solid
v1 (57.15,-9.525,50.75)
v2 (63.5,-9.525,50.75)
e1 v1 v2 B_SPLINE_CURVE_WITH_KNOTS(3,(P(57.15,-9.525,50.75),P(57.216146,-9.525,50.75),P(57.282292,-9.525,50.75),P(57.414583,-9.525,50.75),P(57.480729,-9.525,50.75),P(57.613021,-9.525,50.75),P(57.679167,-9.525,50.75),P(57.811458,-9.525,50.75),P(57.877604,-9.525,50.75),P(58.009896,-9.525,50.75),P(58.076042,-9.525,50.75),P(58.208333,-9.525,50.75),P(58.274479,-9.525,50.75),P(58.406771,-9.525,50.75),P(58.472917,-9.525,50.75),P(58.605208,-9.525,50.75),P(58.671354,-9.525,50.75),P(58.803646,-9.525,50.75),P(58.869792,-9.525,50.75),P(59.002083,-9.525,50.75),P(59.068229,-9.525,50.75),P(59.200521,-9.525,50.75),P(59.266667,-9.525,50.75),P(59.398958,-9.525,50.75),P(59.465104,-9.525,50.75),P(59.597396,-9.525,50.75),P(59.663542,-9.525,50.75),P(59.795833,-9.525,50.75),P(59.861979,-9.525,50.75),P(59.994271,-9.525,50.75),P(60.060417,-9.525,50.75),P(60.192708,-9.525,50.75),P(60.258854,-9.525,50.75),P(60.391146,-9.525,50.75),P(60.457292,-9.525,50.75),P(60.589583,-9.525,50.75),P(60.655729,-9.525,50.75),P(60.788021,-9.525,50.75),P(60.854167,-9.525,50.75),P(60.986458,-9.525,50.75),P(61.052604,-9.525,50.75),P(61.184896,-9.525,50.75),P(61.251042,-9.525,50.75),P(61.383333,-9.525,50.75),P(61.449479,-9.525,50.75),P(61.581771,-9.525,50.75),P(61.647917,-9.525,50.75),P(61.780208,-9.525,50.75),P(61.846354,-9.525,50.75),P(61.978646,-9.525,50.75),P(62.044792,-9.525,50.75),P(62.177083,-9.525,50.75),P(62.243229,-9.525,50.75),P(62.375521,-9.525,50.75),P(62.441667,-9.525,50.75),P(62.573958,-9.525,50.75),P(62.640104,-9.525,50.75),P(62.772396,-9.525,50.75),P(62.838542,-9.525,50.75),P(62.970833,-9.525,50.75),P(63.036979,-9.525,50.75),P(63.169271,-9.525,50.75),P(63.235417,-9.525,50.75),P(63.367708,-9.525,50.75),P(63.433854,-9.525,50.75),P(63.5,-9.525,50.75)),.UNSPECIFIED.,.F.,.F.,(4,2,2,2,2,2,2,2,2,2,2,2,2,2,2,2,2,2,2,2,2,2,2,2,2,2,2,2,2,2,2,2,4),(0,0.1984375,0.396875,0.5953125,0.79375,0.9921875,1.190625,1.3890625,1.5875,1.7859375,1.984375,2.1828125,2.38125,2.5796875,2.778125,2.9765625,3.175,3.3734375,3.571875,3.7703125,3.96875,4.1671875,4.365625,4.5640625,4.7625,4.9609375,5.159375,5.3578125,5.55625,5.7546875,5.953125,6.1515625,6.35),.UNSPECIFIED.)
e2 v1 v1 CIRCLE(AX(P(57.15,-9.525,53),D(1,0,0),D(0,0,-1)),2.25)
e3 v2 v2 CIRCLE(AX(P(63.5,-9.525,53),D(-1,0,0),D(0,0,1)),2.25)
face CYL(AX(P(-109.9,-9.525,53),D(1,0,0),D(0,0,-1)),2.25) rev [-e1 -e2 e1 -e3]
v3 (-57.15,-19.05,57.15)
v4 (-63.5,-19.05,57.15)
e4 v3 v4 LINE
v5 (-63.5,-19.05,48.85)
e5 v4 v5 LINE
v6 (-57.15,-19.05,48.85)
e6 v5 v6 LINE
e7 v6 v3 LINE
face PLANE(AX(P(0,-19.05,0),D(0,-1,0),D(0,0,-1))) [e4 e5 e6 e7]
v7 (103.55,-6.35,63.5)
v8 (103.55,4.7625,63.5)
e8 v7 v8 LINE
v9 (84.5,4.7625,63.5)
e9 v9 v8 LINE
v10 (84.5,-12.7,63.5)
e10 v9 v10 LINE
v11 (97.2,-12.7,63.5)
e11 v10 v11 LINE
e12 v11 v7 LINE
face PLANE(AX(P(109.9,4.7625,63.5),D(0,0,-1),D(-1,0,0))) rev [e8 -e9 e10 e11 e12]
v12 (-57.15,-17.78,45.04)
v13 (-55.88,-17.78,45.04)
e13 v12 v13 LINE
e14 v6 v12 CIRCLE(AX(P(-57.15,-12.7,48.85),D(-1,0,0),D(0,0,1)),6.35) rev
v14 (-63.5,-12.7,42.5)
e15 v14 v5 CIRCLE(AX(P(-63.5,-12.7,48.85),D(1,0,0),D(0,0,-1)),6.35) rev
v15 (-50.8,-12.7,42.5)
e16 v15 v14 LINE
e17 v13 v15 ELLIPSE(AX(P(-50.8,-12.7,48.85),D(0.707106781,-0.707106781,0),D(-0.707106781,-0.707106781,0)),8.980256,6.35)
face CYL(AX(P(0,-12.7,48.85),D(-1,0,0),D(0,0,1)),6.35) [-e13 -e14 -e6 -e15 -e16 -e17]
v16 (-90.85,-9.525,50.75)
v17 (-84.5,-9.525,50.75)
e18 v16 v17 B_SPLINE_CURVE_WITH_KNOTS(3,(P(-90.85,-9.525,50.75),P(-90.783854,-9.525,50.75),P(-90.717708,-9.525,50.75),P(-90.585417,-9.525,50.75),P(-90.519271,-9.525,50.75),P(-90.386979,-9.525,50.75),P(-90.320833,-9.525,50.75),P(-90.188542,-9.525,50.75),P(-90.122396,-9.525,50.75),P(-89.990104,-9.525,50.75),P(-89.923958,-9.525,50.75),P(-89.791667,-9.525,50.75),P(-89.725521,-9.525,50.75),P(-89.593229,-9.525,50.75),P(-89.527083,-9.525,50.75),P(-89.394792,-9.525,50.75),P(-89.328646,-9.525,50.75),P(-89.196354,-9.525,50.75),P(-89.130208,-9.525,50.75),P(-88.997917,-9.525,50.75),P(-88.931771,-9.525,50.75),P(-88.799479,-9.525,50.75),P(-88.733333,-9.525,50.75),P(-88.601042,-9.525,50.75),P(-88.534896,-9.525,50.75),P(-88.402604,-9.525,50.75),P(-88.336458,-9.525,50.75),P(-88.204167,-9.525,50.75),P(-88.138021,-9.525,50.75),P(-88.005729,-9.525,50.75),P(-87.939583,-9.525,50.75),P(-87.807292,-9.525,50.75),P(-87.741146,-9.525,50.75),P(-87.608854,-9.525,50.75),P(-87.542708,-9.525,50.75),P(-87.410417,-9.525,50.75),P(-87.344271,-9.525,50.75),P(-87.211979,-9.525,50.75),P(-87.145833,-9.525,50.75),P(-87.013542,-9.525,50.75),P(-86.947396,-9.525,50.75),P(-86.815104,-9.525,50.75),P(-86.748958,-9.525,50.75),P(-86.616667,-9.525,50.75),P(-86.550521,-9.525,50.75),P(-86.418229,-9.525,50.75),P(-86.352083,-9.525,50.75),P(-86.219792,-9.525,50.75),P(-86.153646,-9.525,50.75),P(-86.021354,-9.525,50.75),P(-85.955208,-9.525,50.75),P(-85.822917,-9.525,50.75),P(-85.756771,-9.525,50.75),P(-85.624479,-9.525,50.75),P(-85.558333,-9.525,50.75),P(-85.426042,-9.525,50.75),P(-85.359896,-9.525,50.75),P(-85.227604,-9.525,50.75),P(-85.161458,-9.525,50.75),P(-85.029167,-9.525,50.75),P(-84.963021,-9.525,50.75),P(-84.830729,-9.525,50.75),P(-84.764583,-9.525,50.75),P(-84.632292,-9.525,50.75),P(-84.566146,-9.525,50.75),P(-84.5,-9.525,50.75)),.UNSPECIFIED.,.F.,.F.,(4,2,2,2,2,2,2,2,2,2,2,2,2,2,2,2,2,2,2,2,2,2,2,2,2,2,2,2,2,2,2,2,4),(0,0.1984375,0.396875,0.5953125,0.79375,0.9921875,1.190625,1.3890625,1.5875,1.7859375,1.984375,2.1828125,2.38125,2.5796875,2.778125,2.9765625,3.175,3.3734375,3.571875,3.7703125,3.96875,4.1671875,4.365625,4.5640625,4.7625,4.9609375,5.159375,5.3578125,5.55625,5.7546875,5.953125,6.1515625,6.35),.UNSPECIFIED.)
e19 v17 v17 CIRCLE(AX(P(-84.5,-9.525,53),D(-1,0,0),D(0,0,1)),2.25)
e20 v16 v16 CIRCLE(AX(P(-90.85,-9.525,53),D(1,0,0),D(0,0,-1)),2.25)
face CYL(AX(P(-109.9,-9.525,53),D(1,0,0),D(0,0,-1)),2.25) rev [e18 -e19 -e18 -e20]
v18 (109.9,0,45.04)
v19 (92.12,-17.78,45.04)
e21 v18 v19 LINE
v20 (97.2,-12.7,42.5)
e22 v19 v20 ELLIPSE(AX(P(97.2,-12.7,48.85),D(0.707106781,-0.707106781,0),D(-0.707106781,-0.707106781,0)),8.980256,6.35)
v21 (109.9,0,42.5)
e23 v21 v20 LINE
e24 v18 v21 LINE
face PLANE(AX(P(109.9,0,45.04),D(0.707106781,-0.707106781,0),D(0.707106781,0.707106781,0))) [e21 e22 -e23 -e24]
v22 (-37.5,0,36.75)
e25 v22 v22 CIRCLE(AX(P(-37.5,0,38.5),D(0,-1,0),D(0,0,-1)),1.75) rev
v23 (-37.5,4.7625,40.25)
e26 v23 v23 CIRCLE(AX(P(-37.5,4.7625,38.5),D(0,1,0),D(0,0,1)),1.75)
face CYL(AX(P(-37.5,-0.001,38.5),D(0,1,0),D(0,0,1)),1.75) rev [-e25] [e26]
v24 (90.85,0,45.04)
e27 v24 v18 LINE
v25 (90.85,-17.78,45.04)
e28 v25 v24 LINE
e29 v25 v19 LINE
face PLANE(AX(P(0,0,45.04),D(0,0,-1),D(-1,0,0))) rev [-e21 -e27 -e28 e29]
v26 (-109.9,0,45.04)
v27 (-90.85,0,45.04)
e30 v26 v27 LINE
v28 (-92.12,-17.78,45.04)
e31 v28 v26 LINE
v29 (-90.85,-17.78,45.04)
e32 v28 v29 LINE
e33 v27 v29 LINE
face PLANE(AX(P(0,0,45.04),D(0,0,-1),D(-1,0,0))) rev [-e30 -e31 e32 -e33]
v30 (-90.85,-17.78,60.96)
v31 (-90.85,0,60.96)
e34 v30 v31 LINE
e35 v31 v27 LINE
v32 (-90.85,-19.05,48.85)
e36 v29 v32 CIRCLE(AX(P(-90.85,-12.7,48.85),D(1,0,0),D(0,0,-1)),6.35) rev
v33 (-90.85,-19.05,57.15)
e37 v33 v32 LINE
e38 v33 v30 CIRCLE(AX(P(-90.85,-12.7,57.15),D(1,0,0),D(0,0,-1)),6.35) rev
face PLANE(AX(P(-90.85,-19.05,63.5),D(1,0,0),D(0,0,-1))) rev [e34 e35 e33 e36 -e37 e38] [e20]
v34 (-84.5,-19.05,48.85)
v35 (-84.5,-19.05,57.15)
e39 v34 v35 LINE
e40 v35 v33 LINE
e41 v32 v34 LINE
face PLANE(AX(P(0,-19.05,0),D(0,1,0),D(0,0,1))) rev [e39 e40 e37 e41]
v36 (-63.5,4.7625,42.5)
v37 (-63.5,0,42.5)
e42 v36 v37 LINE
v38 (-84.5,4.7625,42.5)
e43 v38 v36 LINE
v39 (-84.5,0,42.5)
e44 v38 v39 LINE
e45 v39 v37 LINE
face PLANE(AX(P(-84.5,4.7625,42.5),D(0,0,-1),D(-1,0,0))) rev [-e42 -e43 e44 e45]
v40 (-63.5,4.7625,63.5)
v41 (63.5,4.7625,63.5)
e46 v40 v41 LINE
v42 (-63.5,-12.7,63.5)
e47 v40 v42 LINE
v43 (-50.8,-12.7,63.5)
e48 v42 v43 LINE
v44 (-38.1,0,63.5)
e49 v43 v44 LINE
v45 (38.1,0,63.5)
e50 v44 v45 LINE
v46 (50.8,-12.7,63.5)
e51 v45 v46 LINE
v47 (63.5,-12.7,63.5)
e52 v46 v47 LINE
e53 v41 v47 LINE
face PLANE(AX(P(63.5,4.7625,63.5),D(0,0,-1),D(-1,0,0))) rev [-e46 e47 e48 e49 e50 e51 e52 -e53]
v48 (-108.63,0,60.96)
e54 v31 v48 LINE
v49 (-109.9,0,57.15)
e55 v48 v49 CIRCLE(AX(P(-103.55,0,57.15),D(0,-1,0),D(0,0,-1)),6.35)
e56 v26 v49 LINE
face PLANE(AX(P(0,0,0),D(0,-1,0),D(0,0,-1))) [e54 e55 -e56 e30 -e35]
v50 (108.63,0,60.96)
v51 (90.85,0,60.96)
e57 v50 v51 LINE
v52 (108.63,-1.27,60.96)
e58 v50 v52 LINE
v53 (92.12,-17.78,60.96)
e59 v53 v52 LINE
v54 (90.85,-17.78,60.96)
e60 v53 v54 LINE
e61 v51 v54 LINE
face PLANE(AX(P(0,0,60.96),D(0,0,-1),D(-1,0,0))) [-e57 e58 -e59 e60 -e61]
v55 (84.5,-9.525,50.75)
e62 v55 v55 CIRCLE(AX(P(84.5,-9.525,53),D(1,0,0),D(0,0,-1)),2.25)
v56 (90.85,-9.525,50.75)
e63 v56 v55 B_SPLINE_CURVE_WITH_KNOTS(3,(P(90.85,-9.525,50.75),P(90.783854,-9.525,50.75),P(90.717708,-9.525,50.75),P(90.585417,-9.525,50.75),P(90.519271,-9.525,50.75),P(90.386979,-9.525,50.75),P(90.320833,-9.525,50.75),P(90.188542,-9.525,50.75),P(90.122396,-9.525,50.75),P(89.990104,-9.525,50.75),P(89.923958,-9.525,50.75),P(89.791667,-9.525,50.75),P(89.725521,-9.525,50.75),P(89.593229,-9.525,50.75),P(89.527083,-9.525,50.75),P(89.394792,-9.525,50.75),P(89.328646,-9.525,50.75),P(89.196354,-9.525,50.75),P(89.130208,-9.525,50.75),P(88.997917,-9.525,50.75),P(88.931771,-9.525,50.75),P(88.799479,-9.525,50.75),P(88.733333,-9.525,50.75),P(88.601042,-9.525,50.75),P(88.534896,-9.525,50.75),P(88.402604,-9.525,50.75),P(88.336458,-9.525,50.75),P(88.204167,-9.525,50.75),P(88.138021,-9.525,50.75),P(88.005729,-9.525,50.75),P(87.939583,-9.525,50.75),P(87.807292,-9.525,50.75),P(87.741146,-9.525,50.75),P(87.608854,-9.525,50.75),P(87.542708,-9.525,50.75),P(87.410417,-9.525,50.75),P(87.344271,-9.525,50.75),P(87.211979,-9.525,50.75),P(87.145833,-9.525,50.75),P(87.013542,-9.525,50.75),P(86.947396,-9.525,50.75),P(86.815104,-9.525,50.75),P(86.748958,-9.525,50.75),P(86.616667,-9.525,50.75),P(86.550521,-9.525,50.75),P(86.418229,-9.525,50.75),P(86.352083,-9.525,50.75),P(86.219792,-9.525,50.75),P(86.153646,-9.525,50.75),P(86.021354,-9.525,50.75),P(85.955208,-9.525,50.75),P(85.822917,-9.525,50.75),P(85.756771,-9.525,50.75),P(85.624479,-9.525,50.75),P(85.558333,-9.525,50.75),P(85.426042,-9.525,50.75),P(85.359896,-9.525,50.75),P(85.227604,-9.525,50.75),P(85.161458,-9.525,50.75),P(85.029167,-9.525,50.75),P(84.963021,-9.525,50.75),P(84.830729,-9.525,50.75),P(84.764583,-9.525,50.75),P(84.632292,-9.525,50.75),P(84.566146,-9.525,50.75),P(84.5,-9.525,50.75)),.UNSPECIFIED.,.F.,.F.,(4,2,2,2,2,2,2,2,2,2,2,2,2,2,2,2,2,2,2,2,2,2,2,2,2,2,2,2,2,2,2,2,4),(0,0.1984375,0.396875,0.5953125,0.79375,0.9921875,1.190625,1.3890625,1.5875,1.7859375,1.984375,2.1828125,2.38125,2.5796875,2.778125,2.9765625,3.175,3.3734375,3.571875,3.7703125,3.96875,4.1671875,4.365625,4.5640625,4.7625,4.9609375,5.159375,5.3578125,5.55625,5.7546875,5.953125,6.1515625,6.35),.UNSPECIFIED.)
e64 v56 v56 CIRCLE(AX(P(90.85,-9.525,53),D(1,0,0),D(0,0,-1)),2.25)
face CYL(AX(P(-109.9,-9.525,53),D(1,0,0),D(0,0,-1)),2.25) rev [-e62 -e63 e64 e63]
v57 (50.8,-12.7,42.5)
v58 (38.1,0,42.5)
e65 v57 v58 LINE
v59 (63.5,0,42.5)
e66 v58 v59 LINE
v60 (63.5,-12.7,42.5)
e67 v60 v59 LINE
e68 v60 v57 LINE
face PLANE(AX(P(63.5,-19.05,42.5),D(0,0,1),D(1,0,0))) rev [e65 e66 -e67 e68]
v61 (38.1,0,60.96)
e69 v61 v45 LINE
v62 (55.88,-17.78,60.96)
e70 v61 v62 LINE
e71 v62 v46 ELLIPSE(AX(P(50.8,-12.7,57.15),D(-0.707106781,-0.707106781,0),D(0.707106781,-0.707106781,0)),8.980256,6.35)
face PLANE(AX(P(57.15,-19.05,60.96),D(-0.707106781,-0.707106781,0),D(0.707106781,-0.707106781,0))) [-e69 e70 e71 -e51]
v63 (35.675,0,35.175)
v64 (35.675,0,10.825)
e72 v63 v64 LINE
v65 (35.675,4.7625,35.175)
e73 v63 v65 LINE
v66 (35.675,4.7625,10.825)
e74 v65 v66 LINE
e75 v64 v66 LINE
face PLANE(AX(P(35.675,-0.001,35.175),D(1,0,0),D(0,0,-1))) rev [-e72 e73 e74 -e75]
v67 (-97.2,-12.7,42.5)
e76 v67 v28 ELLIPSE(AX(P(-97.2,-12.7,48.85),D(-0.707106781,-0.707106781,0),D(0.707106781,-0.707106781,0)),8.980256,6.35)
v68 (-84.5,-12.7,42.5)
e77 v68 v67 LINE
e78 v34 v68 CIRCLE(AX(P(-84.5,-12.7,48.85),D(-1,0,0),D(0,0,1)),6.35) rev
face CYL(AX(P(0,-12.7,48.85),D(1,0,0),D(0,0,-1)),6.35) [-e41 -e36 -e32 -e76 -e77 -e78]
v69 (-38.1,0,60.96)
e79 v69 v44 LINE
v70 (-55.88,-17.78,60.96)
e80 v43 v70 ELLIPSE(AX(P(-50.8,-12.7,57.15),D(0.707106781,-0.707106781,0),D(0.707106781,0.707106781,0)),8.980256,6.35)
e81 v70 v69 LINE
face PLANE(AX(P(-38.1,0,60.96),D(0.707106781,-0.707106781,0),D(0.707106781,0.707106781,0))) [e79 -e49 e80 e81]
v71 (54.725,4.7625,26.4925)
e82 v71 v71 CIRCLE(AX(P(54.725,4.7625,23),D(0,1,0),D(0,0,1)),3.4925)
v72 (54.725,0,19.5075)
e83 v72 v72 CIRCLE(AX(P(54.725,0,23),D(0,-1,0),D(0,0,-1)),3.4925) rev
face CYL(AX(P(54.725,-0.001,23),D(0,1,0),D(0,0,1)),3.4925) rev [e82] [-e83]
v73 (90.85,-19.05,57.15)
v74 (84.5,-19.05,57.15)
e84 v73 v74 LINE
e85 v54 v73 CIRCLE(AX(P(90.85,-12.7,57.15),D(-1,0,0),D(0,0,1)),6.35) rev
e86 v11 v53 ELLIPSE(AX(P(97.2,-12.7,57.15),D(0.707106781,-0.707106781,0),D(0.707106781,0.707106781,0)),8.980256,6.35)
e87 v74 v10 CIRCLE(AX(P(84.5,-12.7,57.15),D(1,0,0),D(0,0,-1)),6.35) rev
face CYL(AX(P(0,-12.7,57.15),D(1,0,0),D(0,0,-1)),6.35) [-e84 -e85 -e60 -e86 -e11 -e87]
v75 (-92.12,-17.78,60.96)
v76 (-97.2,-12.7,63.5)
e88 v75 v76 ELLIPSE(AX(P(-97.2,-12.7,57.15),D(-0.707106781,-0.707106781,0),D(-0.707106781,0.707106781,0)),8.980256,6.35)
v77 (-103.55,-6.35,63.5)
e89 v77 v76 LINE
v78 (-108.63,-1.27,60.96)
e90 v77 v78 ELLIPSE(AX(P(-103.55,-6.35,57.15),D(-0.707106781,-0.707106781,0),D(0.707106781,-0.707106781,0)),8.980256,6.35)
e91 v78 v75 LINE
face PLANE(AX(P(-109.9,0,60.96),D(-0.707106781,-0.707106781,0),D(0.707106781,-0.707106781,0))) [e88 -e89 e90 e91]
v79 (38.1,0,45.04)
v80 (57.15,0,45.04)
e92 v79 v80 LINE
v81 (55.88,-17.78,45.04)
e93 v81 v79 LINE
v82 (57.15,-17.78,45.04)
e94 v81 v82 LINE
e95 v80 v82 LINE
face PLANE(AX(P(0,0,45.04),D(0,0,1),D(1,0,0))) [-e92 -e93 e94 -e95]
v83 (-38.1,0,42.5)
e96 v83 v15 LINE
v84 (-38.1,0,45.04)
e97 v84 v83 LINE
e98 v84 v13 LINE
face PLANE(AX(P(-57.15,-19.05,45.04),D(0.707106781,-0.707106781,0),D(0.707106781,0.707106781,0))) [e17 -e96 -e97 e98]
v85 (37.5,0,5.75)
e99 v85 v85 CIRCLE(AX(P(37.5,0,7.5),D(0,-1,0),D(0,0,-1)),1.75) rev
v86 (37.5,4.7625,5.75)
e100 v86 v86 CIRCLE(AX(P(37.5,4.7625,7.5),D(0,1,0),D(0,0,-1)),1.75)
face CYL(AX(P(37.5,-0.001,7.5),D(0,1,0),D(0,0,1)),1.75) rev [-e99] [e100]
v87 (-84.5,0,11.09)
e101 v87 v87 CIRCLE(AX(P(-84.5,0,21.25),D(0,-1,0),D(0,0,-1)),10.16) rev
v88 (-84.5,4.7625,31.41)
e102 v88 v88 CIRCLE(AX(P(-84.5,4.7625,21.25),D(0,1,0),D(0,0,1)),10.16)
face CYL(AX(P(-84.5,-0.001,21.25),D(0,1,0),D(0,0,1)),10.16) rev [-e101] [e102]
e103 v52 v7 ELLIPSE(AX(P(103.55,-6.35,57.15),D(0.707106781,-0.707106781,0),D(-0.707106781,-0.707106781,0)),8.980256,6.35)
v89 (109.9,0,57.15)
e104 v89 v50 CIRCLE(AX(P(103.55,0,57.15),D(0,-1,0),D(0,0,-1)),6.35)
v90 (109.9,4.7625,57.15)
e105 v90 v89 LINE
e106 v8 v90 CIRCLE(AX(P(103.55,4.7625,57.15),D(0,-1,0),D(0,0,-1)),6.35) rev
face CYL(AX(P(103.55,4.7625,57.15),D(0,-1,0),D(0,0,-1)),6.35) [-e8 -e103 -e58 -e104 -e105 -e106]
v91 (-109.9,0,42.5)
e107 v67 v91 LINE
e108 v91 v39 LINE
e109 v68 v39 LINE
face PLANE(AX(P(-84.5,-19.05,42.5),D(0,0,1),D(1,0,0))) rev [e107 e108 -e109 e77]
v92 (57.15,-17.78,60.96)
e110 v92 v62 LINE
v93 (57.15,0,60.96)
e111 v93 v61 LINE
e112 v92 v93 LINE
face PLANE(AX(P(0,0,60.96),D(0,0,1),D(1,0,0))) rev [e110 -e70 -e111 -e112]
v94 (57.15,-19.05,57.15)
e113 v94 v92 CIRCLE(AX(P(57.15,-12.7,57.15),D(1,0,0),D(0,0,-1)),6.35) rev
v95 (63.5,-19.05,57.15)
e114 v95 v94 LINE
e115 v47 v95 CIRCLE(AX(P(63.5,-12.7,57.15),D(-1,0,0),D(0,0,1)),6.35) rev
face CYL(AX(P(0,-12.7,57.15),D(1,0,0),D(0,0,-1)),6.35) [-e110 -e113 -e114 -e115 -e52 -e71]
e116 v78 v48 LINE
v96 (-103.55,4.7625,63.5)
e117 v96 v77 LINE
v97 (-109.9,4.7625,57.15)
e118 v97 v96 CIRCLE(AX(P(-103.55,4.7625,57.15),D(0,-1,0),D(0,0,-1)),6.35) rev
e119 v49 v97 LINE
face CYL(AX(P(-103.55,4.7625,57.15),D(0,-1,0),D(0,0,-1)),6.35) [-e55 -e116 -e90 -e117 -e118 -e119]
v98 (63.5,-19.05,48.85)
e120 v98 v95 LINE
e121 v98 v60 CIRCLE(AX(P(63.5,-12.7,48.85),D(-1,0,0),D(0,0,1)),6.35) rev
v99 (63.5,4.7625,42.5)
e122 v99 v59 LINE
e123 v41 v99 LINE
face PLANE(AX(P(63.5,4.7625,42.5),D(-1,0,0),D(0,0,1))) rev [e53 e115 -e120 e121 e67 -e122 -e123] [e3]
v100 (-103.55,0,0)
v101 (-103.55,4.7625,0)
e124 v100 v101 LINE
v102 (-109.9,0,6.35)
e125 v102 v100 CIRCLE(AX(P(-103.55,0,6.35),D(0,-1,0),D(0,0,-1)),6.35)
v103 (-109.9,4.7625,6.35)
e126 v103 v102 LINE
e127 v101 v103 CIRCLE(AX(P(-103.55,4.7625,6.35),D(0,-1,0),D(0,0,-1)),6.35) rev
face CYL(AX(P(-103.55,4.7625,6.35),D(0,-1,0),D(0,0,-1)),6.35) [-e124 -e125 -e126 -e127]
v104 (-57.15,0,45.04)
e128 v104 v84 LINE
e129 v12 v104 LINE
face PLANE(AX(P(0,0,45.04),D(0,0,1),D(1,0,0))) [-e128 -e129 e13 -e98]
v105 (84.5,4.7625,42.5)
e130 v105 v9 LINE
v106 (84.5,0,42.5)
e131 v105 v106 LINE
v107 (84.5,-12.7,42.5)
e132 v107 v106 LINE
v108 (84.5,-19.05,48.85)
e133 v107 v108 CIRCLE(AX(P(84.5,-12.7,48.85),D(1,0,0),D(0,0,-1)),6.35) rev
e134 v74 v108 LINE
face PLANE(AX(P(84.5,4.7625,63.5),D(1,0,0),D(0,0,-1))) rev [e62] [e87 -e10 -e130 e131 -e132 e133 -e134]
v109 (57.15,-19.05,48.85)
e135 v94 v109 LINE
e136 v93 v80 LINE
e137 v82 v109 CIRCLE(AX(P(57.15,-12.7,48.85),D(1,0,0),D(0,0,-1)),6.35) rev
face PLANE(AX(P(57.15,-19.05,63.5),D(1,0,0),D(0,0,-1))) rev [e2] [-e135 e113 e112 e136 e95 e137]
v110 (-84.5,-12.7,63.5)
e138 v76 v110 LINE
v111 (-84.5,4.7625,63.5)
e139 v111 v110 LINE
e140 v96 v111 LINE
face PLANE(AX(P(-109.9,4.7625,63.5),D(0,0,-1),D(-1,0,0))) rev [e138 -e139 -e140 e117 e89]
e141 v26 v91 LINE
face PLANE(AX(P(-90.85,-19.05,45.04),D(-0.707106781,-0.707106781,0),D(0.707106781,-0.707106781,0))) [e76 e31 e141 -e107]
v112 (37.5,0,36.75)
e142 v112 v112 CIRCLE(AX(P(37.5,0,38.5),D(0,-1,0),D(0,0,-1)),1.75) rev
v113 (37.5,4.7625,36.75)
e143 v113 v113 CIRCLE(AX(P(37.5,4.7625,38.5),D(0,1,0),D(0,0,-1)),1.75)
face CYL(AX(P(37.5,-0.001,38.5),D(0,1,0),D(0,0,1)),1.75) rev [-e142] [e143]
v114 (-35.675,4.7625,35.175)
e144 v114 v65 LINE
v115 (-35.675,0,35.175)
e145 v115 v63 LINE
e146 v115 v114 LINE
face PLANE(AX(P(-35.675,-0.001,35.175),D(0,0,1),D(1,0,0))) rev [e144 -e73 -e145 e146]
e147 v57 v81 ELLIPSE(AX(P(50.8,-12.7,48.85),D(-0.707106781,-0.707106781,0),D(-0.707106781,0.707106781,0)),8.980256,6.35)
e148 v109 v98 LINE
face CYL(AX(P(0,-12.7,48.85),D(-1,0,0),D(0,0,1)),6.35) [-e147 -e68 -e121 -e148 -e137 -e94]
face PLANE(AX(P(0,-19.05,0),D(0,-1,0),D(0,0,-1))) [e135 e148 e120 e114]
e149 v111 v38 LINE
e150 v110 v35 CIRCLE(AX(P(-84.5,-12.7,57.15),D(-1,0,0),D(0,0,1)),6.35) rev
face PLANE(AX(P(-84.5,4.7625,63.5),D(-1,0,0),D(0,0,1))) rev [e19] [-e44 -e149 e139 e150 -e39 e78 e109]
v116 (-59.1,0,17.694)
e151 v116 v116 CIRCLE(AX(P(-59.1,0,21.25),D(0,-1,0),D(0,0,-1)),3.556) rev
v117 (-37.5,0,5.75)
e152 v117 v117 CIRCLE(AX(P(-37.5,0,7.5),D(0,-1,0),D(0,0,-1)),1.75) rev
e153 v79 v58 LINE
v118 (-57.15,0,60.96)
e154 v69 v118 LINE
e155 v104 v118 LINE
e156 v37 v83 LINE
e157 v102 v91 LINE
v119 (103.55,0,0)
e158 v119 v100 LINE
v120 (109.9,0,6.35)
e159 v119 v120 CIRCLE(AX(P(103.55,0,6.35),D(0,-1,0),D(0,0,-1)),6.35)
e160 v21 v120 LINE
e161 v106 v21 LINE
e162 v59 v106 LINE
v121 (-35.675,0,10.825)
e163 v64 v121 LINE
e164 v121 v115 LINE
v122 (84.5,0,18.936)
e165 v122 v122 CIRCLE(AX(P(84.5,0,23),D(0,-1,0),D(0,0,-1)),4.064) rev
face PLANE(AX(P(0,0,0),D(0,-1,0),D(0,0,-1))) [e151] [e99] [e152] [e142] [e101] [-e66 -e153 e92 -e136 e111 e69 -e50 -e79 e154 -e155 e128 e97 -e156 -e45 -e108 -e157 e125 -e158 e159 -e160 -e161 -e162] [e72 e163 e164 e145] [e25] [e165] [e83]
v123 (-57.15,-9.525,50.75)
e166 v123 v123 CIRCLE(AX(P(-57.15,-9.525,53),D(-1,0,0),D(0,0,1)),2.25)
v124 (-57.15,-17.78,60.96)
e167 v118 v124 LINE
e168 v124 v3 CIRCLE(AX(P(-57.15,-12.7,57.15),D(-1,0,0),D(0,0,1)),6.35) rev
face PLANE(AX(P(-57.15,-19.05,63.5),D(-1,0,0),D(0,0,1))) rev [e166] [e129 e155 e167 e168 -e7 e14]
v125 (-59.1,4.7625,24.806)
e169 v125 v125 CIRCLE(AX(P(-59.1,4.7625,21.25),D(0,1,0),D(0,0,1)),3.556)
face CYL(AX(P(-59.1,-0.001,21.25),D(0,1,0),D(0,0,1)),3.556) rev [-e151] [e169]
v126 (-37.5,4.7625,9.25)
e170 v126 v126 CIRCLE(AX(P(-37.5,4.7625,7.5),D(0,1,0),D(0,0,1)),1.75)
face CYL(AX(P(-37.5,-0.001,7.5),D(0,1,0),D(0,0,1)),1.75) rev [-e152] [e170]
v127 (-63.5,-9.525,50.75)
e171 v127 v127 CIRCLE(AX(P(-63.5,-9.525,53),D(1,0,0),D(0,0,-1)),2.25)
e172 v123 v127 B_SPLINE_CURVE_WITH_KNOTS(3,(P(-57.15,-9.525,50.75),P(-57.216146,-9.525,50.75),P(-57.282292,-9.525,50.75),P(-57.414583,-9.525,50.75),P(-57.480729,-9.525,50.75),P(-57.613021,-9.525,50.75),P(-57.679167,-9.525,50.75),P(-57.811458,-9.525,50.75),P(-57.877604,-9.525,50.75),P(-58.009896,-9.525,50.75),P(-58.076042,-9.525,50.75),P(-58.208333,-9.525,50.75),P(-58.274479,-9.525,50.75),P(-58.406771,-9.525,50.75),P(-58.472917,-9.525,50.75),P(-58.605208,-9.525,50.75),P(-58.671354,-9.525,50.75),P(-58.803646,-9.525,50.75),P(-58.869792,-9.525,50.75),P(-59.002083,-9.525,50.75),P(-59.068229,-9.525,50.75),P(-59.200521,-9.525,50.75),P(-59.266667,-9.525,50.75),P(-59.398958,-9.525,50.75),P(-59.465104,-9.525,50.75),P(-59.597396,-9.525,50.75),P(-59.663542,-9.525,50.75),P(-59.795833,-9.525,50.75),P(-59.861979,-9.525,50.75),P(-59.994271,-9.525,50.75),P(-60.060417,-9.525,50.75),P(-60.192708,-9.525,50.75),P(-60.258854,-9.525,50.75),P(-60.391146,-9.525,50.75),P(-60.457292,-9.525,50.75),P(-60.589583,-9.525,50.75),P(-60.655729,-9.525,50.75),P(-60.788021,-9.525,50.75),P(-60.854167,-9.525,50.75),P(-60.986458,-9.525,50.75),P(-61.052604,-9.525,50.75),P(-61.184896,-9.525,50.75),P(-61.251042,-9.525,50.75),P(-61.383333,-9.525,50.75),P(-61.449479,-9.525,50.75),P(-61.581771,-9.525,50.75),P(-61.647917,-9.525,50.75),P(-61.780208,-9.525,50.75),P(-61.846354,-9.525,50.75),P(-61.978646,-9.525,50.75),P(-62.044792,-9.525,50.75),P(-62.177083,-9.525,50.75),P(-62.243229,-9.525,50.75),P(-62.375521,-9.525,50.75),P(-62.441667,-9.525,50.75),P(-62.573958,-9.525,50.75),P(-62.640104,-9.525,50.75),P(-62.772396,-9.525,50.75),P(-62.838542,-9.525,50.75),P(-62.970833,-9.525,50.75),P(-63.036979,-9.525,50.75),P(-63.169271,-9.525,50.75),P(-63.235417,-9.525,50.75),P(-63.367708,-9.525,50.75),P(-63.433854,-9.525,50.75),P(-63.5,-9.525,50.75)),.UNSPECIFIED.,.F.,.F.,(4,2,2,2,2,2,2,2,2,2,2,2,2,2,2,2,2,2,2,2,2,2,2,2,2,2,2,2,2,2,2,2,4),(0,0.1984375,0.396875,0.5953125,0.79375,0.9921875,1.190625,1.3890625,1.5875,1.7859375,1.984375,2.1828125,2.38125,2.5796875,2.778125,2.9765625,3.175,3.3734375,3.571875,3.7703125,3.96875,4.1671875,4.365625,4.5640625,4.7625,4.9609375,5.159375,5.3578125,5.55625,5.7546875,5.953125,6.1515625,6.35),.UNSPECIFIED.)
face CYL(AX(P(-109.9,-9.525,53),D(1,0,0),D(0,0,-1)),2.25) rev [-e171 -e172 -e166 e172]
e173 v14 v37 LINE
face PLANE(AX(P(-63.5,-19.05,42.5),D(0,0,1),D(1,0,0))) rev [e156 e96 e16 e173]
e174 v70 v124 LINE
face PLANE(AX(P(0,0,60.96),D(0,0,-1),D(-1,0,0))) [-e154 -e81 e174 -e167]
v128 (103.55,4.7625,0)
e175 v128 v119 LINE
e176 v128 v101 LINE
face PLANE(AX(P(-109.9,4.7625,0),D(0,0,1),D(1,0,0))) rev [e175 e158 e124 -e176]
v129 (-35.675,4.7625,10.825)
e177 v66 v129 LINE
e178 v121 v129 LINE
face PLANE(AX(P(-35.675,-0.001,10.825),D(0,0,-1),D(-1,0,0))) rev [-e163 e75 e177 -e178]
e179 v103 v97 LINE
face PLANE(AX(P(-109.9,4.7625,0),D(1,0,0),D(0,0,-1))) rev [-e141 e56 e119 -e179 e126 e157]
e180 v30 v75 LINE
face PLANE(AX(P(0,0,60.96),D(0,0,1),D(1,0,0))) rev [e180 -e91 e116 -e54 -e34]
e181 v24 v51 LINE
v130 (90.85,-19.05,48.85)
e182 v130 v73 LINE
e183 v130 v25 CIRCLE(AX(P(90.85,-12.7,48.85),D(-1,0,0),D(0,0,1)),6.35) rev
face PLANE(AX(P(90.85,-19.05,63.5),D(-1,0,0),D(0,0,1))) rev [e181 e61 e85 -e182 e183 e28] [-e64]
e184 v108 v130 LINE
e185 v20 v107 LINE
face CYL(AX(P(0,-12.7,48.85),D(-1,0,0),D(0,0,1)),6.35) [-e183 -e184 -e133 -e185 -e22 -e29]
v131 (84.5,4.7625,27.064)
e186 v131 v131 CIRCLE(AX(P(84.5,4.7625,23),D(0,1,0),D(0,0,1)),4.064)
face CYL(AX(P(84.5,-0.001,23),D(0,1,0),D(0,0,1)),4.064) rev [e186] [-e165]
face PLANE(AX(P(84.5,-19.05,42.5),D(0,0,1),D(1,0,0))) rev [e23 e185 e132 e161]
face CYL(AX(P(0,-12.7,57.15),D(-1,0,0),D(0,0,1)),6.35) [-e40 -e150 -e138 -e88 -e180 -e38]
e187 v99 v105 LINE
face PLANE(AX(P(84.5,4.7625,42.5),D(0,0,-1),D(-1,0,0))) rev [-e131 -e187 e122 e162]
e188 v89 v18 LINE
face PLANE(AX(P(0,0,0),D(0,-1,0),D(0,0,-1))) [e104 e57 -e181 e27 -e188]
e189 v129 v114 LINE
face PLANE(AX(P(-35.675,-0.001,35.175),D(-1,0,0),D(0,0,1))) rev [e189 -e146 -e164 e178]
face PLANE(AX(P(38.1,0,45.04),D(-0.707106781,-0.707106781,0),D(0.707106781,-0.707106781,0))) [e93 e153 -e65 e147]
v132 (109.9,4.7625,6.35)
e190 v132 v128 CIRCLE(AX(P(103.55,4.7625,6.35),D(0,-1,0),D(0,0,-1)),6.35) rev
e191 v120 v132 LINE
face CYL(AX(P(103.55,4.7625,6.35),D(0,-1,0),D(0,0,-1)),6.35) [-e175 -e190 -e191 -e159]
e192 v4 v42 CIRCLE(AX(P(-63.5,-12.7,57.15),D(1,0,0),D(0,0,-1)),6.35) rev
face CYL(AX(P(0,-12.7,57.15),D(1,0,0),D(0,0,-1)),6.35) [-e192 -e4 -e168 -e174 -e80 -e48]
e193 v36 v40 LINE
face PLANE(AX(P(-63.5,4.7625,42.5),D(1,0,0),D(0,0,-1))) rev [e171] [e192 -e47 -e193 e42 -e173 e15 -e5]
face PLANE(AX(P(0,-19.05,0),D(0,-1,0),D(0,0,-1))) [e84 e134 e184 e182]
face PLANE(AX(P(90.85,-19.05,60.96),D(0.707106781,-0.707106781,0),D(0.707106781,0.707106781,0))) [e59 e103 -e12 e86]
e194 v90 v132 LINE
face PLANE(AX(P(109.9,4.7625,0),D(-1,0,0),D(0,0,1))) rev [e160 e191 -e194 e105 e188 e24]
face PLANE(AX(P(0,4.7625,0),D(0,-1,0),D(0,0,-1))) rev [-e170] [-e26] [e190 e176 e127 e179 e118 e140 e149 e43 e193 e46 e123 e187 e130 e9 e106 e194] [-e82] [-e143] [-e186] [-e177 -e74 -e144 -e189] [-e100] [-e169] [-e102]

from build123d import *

# Parameters (mm, degrees)
BOSS_EXTRUDE1_DEPTH = 4.7625
CUT_EXTRUDE1_REACH  = 129.016
SKETCH3_R           = 10.16
SKETCH3_R_2         = 3.556
SKETCH3_R_3         = 1.75
SKETCH3_R_4         = 3.4925
SKETCH3_R_5         = 4.064
SKETCH3_W           = 71.35
SKETCH3_H           = 24.35
SKETCH4_W           = 6.35
SKETCH4_H           = 21
BOSS_EXTRUDE2_DEPTH = 19.05
SKETCH5_R           = 2.25
CUT_EXTRUDE2_DEPTH  = 212.413611199
BOSS_EXTRUDE3_DEPTH = 2.54
BOSS_EXTRUDE4_DEPTH = 2.54
FILLET1_R           = 6.35


with BuildPart() as part:
    # Sketch2 → Boss-Extrude1 (new body)
    with BuildSketch(Plane(origin=(0, 0, 0), x_dir=(1, 0, 0), z_dir=(0, 1, 0))):
        Polygon((-109.9, 0), (109.9, 0), (109.9, -63.5), (84.5, -63.5), (84.5, -42.5), (63.5, -42.5), (63.5, -63.5), (-63.5, -63.5), (-63.5, -42.5), (-84.5, -42.5), (-84.5, -63.5), (-109.9, -63.5), align=None)
    extrude(amount=BOSS_EXTRUDE1_DEPTH)

    # Sketch3 → Cut-Extrude1 (cut, up to next)
    with BuildSketch(Plane(origin=(0, 4.7625, 0), x_dir=(1, 0, 0), z_dir=(0, 1, 0)), mode=Mode.PRIVATE) as cut_extrude1_sk1:
        with Locations(Location((-84.5, -21.25, 0), (0, 0, 270))):
            Circle(SKETCH3_R)
    cut_extrude1_tool1 = extrude(cut_extrude1_sk1.sketch, amount=-CUT_EXTRUDE1_REACH, mode=Mode.PRIVATE) & part.part
    # Sketch3 → Cut-Extrude1 (cut, up to next)
    with BuildSketch(Plane(origin=(0, 4.7625, 0), x_dir=(1, 0, 0), z_dir=(0, 1, 0)), mode=Mode.PRIVATE) as cut_extrude1_sk2:
        with Locations(Location((-59.1, -21.25, 0), (0, 0, 270))):
            Circle(SKETCH3_R_2)
    cut_extrude1_tool2 = extrude(cut_extrude1_sk2.sketch, amount=-CUT_EXTRUDE1_REACH, mode=Mode.PRIVATE) & part.part
    # Sketch3 → Cut-Extrude1 (cut, up to next)
    with BuildSketch(Plane(origin=(0, 4.7625, 0), x_dir=(1, 0, 0), z_dir=(0, 1, 0)), mode=Mode.PRIVATE) as cut_extrude1_sk3:
        with Locations(Location((-37.5, -38.5, 0), (0, 0, 270))):
            Circle(SKETCH3_R_3)
    cut_extrude1_tool3 = extrude(cut_extrude1_sk3.sketch, amount=-CUT_EXTRUDE1_REACH, mode=Mode.PRIVATE) & part.part
    # Sketch3 → Cut-Extrude1 (cut, up to next)
    with BuildSketch(Plane(origin=(0, 4.7625, 0), x_dir=(1, 0, 0), z_dir=(0, 1, 0)), mode=Mode.PRIVATE) as cut_extrude1_sk4:
        with Locations(Location((-37.5, -7.5, 0), (0, 0, 270))):
            Circle(SKETCH3_R_3)
    cut_extrude1_tool4 = extrude(cut_extrude1_sk4.sketch, amount=-CUT_EXTRUDE1_REACH, mode=Mode.PRIVATE) & part.part
    # Sketch3 → Cut-Extrude1 (cut, up to next)
    with BuildSketch(Plane(origin=(0, 4.7625, 0), x_dir=(1, 0, 0), z_dir=(0, 1, 0)), mode=Mode.PRIVATE) as cut_extrude1_sk5:
        with Locations(Location((37.5, -38.5, 0), (0, 0, 90))):
            Circle(SKETCH3_R_3)
    cut_extrude1_tool5 = extrude(cut_extrude1_sk5.sketch, amount=-CUT_EXTRUDE1_REACH, mode=Mode.PRIVATE) & part.part
    # Sketch3 → Cut-Extrude1 (cut, up to next)
    with BuildSketch(Plane(origin=(0, 4.7625, 0), x_dir=(1, 0, 0), z_dir=(0, 1, 0)), mode=Mode.PRIVATE) as cut_extrude1_sk6:
        with Locations(Location((37.5, -7.5, 0), (0, 0, 90))):
            Circle(SKETCH3_R_3)
    cut_extrude1_tool6 = extrude(cut_extrude1_sk6.sketch, amount=-CUT_EXTRUDE1_REACH, mode=Mode.PRIVATE) & part.part
    # Sketch3 → Cut-Extrude1 (cut, up to next)
    with BuildSketch(Plane(origin=(0, 4.7625, 0), x_dir=(1, 0, 0), z_dir=(0, 1, 0)), mode=Mode.PRIVATE) as cut_extrude1_sk7:
        with Locations(Location((54.725, -23, 0), (0, 0, 270))):
            Circle(SKETCH3_R_4)
    cut_extrude1_tool7 = extrude(cut_extrude1_sk7.sketch, amount=-CUT_EXTRUDE1_REACH, mode=Mode.PRIVATE) & part.part
    # Sketch3 → Cut-Extrude1 (cut, up to next)
    with BuildSketch(Plane(origin=(0, 4.7625, 0), x_dir=(1, 0, 0), z_dir=(0, 1, 0)), mode=Mode.PRIVATE) as cut_extrude1_sk8:
        with Locations(Location((84.5, -23, 0), (0, 0, 270))):
            Circle(SKETCH3_R_5)
    cut_extrude1_tool8 = extrude(cut_extrude1_sk8.sketch, amount=-CUT_EXTRUDE1_REACH, mode=Mode.PRIVATE) & part.part
    # Sketch3 → Cut-Extrude1 (cut, up to next)
    with BuildSketch(Plane(origin=(0, 4.7625, 0), x_dir=(1, 0, 0), z_dir=(0, 1, 0)), mode=Mode.PRIVATE) as cut_extrude1_sk9:
        with Locations((0, -23)):
            Rectangle(SKETCH3_W, SKETCH3_H)
    cut_extrude1_tool9 = extrude(cut_extrude1_sk9.sketch, amount=-CUT_EXTRUDE1_REACH, mode=Mode.PRIVATE) & part.part
    add(cut_extrude1_tool1.solids().sort_by_distance((-84.5, 4.7625, 21.25))[0], mode=Mode.SUBTRACT)
    add(cut_extrude1_tool2.solids().sort_by_distance((-59.1, 4.7625, 21.25))[0], mode=Mode.SUBTRACT)
    add(cut_extrude1_tool3.solids().sort_by_distance((-37.5, 4.7625, 38.5))[0], mode=Mode.SUBTRACT)
    add(cut_extrude1_tool4.solids().sort_by_distance((-37.5, 4.7625, 7.5))[0], mode=Mode.SUBTRACT)
    add(cut_extrude1_tool5.solids().sort_by_distance((37.5, 4.7625, 38.5))[0], mode=Mode.SUBTRACT)
    add(cut_extrude1_tool6.solids().sort_by_distance((37.5, 4.7625, 7.5))[0], mode=Mode.SUBTRACT)
    add(cut_extrude1_tool7.solids().sort_by_distance((54.725, 4.7625, 23))[0], mode=Mode.SUBTRACT)
    add(cut_extrude1_tool8.solids().sort_by_distance((84.5, 4.7625, 23))[0], mode=Mode.SUBTRACT)
    add(cut_extrude1_tool9.solids().sort_by_distance((0, 4.7625, 23))[0], mode=Mode.SUBTRACT)

    # Sketch4 → Boss-Extrude2 (add)
    with BuildSketch(Plane.XZ):
        with Locations((-87.675, 53)):
            Rectangle(SKETCH4_W, SKETCH4_H)
        with Locations((87.675, 53)):
            Rectangle(SKETCH4_W, SKETCH4_H)
        with Locations((-60.325, 53)):
            Rectangle(SKETCH4_W, SKETCH4_H)
        with Locations((60.325, 53)):
            Rectangle(SKETCH4_W, SKETCH4_H)
    extrude(amount=BOSS_EXTRUDE2_DEPTH)

    # Sketch5 → Cut-Extrude2 (cut, through all)
    with BuildSketch(Plane(origin=(90.85, 0, 0), x_dir=(0, 0, -1), z_dir=(1, 0, 0))):
        with Locations((-53, -9.525)):
            Circle(SKETCH5_R)
    extrude(amount=-CUT_EXTRUDE2_DEPTH, mode=Mode.SUBTRACT)

    # Sketch6 → Boss-Extrude3 (add)
    with BuildSketch(Plane.XY.offset(63.5)):
        Polygon((90.85, -19.05), (109.9, 0), (90.85, 0), align=None)
        Polygon((57.15, -19.05), (38.1, 0), (57.15, 0), align=None)
        Polygon((-90.85, -19.05), (-90.85, 0), (-109.9, 0), align=None)
        Polygon((-57.15, -19.05), (-57.15, 0), (-38.1, 0), align=None)
    extrude(amount=-BOSS_EXTRUDE3_DEPTH)

    # Sketch7 → Boss-Extrude4 (add)
    with BuildSketch(Plane(origin=(0, 0, 42.5), x_dir=(-1, 0, 0), z_dir=(0, 0, -1))):
        Polygon((-90.85, -19.05), (-90.85, 0), (-109.9, 0), align=None)
        Polygon((-57.15, 0), (-38.1, 0), (-57.15, -19.05), align=None)
        Polygon((57.15, 0), (57.15, -19.05), (38.1, 0), align=None)
        Polygon((90.85, 0), (90.85, -19.05), (109.9, 0), align=None)
    extrude(amount=-BOSS_EXTRUDE4_DEPTH)

    # Fillet1
    # the kernel refuses this fillet: 6.35 mm, written as the material it takes off along each edge
    with BuildSketch(Plane(origin=(-79.375, -19.05, 42.5), x_dir=(0, 1, 0), z_dir=(1, 0, 0)), Plane(origin=(-41.275, -19.05, 63.5), x_dir=(0, 1, 0), z_dir=(-1, 0, 0)), Plane(origin=(79.375, -19.05, 42.5), x_dir=(0, 0, 1), z_dir=(-1, 0, 0)), Plane(origin=(68.625, -19.05, 42.5), x_dir=(0, 1, 0), z_dir=(1, 0, 0))) as fillet1_piece_1:
        with BuildLine():
            CenterArc((FILLET1_R, FILLET1_R), FILLET1_R, 180, 90)
            Line((0, FILLET1_R), (0, 0))
            Line((0, 0), (FILLET1_R, 0))
        make_face()
    extrude(amount=38.1, mode=Mode.SUBTRACT)
    with BuildSketch(Plane(origin=(41.275, -19.05, 63.5), x_dir=(0, 1, 0), z_dir=(1, 0, 0)), Plane(origin=(-68.625, -19.05, 63.5), x_dir=(0, 0, -1), z_dir=(-1, 0, 0)), Plane(origin=(-106.725, -19.05, 42.5), x_dir=(0, 0, 1), z_dir=(1, 0, 0)), Plane(origin=(106.725, -19.05, 63.5), x_dir=(0, 0, -1), z_dir=(-1, 0, 0))) as fillet1_piece_2:
        with BuildLine():
            CenterArc((FILLET1_R, -FILLET1_R), FILLET1_R, 90, 90)
            Line((0, -FILLET1_R), (0, 0))
            Line((0, 0), (FILLET1_R, 0))
        make_face()
    extrude(amount=38.1, mode=Mode.SUBTRACT)
    with BuildSketch(Plane(origin=(109.9, -15.875, 63.5), x_dir=(-1, 0, 0), z_dir=(0, 1, 0)), Plane(origin=(-109.9, -15.875, 0), x_dir=(1, 0, 0), z_dir=(0, 1, 0))) as fillet1_piece_3:
        with BuildLine():
            CenterArc((FILLET1_R, -FILLET1_R), FILLET1_R, 90, 90)
            Line((0, -FILLET1_R), (0, 0))
            Line((0, 0), (FILLET1_R, 0))
        make_face()
    extrude(amount=36.5125, mode=Mode.SUBTRACT)
    with BuildSketch(Plane(origin=(-109.9, -15.875, 63.5), x_dir=(1, 0, 0), z_dir=(0, 1, 0)), Plane(origin=(109.9, -15.875, 0), x_dir=(-1, 0, 0), z_dir=(0, 1, 0))) as fillet1_piece_4:
        with BuildLine():
            CenterArc((FILLET1_R, FILLET1_R), FILLET1_R, 180, 90)
            Line((0, FILLET1_R), (0, 0))
            Line((0, 0), (FILLET1_R, 0))
        make_face()
    extrude(amount=36.5125, mode=Mode.SUBTRACT)


solid = part.part
